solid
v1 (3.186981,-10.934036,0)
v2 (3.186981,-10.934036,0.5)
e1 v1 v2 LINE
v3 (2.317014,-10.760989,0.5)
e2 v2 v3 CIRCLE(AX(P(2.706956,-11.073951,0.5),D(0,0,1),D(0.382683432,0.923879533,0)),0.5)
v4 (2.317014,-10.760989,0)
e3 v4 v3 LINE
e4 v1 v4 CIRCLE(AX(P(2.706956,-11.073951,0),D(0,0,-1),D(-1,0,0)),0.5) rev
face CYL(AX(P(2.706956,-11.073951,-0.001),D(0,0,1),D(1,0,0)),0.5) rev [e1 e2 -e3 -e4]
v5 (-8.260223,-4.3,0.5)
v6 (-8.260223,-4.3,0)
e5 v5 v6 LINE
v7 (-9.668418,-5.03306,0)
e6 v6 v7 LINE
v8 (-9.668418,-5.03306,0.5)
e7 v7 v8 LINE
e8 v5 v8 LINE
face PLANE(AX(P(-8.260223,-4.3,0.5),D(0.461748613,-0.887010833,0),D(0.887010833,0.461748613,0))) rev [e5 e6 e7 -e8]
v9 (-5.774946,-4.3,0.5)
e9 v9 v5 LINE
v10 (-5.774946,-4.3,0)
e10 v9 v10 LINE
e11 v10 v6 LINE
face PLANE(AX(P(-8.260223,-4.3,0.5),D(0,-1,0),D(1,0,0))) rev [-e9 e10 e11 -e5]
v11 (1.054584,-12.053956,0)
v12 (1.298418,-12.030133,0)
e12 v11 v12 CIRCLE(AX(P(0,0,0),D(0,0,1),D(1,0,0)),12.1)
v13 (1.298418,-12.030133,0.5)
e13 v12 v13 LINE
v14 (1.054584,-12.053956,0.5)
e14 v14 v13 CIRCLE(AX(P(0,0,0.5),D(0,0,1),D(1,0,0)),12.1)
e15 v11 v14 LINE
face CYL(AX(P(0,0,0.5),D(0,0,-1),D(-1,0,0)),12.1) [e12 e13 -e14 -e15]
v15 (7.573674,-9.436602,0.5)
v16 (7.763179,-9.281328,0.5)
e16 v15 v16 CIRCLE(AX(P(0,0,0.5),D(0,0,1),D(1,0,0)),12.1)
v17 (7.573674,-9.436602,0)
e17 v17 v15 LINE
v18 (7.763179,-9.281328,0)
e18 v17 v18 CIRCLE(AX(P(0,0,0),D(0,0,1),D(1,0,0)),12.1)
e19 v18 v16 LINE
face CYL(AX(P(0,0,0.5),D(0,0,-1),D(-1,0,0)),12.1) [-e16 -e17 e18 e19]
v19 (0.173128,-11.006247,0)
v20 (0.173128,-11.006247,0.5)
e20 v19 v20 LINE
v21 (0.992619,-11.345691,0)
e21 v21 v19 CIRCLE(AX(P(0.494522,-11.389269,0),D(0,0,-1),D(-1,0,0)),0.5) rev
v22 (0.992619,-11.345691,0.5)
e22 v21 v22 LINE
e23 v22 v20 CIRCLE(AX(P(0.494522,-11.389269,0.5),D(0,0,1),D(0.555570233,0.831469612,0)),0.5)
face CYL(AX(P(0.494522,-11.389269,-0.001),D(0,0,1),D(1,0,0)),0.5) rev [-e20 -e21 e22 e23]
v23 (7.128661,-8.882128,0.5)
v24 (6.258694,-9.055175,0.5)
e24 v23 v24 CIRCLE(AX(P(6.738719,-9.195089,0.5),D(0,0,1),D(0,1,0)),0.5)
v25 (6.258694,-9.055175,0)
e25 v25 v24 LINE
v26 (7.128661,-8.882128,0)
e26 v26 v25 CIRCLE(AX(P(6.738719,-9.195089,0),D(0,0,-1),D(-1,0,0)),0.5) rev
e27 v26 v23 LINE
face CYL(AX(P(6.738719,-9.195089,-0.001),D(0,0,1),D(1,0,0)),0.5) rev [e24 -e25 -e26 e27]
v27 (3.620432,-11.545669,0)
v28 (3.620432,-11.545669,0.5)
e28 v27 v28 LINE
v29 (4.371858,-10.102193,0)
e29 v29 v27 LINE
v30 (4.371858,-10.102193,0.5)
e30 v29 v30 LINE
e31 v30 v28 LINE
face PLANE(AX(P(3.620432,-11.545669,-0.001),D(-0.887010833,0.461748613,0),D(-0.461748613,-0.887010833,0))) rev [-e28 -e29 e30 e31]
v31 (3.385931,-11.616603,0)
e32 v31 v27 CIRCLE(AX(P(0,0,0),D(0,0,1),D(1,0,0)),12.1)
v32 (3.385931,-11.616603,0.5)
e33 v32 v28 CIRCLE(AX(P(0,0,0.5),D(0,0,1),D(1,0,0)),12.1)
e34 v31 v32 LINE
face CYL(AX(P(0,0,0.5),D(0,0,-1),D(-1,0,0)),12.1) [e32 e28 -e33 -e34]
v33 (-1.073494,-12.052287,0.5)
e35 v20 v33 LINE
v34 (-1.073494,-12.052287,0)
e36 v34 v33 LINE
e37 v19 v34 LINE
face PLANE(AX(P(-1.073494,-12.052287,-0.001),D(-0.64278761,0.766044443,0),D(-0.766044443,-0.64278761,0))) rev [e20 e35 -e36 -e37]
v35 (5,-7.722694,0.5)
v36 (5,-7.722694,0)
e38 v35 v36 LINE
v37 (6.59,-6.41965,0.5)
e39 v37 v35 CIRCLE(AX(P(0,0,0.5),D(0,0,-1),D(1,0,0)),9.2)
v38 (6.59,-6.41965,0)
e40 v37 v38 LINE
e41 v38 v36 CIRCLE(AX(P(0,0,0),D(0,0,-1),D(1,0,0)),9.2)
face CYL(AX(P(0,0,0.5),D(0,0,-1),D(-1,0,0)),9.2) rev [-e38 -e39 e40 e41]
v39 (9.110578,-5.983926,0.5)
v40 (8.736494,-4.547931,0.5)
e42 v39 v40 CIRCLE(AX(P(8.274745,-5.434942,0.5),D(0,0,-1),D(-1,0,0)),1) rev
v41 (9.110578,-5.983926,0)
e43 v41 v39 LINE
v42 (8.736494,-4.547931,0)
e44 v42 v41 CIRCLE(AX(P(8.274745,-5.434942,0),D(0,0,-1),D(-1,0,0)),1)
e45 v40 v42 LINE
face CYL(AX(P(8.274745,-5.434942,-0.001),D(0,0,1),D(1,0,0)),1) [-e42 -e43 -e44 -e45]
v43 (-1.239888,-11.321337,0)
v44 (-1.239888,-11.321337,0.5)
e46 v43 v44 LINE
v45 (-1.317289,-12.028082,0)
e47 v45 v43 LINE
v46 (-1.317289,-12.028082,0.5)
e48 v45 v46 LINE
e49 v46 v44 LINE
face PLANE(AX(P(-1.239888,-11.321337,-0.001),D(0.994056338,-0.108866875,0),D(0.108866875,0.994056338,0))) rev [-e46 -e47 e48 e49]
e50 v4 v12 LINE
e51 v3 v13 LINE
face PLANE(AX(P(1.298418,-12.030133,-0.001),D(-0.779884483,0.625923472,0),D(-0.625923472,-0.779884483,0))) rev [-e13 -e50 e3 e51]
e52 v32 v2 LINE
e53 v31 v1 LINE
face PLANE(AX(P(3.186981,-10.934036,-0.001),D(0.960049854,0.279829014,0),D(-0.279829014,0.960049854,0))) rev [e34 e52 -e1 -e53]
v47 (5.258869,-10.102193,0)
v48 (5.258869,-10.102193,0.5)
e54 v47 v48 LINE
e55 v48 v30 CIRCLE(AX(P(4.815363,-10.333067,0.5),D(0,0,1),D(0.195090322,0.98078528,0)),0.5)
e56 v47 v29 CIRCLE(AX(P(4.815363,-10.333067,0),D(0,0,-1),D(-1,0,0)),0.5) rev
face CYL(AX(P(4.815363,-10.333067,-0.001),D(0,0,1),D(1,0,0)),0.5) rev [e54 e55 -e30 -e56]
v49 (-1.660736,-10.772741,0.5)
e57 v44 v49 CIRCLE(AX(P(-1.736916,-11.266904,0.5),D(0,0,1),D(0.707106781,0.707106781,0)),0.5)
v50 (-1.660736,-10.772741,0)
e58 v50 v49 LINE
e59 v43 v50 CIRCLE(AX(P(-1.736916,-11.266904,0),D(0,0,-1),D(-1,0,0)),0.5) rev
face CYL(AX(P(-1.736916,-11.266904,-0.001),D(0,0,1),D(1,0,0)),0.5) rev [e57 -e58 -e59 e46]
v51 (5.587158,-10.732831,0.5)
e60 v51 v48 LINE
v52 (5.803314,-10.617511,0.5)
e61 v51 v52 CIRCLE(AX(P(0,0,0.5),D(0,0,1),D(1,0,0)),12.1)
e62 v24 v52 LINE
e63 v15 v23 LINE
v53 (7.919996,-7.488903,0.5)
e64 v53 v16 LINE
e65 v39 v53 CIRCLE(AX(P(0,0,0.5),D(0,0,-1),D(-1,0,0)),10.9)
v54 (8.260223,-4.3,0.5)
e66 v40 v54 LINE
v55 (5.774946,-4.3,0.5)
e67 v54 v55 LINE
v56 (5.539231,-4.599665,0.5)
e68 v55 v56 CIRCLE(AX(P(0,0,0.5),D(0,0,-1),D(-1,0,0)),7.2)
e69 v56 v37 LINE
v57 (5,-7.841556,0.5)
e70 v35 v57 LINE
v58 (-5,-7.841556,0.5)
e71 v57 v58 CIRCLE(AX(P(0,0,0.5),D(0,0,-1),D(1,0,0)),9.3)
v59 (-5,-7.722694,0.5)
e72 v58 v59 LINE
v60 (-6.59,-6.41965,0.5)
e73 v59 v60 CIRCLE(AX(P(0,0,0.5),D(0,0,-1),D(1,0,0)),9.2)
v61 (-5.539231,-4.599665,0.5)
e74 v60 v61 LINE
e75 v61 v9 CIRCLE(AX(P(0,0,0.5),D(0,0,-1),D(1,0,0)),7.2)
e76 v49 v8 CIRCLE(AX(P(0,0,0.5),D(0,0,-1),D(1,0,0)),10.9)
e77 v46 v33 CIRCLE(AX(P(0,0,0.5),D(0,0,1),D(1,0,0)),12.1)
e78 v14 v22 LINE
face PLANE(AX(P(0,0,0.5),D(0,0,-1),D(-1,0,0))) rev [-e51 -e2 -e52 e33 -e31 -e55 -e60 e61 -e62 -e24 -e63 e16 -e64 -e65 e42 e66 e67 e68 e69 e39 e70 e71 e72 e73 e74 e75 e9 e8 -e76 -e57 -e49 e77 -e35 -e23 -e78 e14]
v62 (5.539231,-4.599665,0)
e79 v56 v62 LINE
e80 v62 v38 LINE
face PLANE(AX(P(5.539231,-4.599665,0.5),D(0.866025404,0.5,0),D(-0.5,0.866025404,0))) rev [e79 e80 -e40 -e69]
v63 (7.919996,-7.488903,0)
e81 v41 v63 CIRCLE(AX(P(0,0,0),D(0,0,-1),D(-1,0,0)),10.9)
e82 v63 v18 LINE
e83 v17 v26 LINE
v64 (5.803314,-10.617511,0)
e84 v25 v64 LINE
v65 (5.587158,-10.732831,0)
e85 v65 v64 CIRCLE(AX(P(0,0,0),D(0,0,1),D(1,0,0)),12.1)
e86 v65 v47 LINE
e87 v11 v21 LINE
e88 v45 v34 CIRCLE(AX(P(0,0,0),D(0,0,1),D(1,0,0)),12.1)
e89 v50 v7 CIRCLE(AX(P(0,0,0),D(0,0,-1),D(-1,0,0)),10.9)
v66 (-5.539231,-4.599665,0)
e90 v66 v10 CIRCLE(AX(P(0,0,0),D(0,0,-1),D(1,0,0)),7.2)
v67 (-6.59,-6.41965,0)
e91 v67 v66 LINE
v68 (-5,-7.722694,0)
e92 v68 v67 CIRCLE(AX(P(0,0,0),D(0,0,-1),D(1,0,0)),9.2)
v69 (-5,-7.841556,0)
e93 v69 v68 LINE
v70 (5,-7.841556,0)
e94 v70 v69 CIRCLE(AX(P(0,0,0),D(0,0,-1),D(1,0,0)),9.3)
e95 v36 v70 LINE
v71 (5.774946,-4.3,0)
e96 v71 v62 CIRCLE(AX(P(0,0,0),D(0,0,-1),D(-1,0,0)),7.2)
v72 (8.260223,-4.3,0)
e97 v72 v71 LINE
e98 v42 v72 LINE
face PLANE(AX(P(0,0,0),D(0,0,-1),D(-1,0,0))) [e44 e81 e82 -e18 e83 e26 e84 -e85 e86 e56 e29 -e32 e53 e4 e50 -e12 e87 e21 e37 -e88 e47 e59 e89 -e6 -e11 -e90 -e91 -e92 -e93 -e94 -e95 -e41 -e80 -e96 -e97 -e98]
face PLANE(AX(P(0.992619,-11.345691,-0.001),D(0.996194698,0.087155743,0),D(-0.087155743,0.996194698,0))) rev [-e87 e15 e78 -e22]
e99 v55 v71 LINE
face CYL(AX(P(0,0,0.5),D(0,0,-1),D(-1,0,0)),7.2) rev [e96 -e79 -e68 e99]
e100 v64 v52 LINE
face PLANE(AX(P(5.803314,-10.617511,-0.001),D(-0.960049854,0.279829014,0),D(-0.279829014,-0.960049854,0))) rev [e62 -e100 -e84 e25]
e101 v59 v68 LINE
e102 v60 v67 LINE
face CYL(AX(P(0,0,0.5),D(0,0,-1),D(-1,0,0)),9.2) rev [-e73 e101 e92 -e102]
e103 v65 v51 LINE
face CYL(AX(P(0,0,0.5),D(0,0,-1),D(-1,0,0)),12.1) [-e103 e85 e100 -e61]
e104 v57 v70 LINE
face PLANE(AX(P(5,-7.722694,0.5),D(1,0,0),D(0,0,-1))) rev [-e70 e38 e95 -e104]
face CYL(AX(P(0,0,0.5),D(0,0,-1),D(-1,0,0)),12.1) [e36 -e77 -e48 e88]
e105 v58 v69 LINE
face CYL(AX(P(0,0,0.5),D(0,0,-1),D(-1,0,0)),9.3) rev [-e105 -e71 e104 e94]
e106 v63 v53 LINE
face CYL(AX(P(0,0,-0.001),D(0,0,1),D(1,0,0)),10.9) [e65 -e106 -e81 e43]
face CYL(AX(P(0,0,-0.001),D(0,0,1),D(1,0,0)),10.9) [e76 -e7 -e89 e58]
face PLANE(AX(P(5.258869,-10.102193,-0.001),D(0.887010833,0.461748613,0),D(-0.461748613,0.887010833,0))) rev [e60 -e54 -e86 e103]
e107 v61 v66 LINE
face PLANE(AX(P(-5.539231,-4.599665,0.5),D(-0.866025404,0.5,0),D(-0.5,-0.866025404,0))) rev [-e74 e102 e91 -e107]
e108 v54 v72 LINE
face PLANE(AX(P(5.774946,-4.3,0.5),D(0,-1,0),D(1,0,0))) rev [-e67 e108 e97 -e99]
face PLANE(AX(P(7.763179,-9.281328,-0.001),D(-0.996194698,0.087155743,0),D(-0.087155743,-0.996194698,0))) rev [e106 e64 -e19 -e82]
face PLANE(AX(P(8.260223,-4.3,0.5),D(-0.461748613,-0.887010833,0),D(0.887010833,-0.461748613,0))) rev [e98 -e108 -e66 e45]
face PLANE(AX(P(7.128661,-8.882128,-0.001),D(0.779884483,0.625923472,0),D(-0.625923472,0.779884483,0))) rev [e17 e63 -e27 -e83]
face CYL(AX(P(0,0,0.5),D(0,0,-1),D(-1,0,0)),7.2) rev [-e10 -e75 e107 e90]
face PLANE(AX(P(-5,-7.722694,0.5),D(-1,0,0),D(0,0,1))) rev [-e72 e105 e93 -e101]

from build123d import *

# Parameters (mm, degrees)
OTHER_10076_5_DEPTH = 0.5
CUT_EXTRUDE1_START  = -0.5
CUT_EXTRUDE1_DEPTH  = 0.5


# Read off the part's stored shape, not the designer's step: 10076-5
with BuildPart() as part:
    # Other 10076-5 outline → Other 10076-5 (new body)
    with BuildSketch(Plane.XY):
        with BuildLine():
            ThreePointArc((7.573674013, -9.436602245), (7.668819519, -9.359444812), (7.763179028, -9.281328104))
            Line((7.763179028, -9.281328104), (7.919995926, -7.488902759))
            ThreePointArc((7.919995926, -7.488902759), (8.548470738, -6.76266575), (9.110578105, -5.983925684))
            ThreePointArc((9.110578105, -5.983925684), (9.242448569, -5.182849851), (8.736493865, -4.547930843))
            Line((8.736493865, -4.547930843), (8.260223146, -4.3))
            Line((8.260223146, -4.3), (5.774945887, -4.3))
            ThreePointArc((5.774945887, -4.3), (5.659072475, -4.451392897), (5.53923133, -4.5996648))
            Line((5.53923133, -4.5996648), (6.59, -6.419649523))
            ThreePointArc((6.59, -6.419649523), (5.831509763, -7.1157216), (5, -7.722693831))
            Line((5, -7.722693831), (5, -7.841555968))
            ThreePointArc((5, -7.841555968), (0, -9.3), (-5, -7.841555968))
            Line((-5, -7.841555968), (-5, -7.722693831))
            ThreePointArc((-5, -7.722693831), (-5.831509763, -7.1157216), (-6.59, -6.419649523))
            Line((-6.59, -6.419649523), (-5.53923133, -4.5996648))
            ThreePointArc((-5.53923133, -4.5996648), (-5.659072475, -4.451392897), (-5.774945887, -4.3))
            Line((-5.774945887, -4.3), (-8.260223146, -4.3))
            Line((-8.260223146, -4.3), (-10.732831081, -5.58715822))
            ThreePointArc((-10.732831081, -5.58715822), (-10.675718173, -5.6955282), (-10.617511084, -5.803314431))
            Line((-10.617511084, -5.803314431), (-9.055174855, -6.258693914))
            ThreePointArc((-9.055174855, -6.258693914), (-8.704696722, -6.64117368), (-8.882127626, -7.128661083))
            Line((-8.882127626, -7.128661083), (-9.436602245, -7.573674013))
            ThreePointArc((-9.436602245, -7.573674013), (-9.359444812, -7.668819519), (-9.281328104, -7.763179028))
            Line((-9.281328104, -7.763179028), (-7.660171598, -7.905011844))
            ThreePointArc((-7.660171598, -7.905011844), (-7.241809703, -8.211767477), (-7.320727248, -8.724502998))
            Line((-7.320727248, -8.724502998), (-7.777730077, -9.269137762))
            ThreePointArc((-7.777730077, -9.269137762), (-7.683493234, -9.347402405), (-7.588468891, -9.424709008))
            Line((-7.588468891, -9.424709008), (-5.970792243, -9.247544602))
            ThreePointArc((-5.970792243, -9.247544602), (-5.500623999, -9.466787654), (-5.477995427, -9.985067155))
            Line((-5.477995427, -9.985067155), (-5.819964104, -10.608393744))
            ThreePointArc((-5.819964104, -10.608393744), (-5.712269322, -10.666769858), (-5.603989074, -10.724052707))
            Line((-5.603989074, -10.724052707), (-4.05195869, -10.234699407))
            ThreePointArc((-4.05195869, -10.234699407), (-3.548052399, -10.358004491), (-3.424747314, -10.861910782))
            Line((-3.424747314, -10.861910782), (-3.638540174, -11.539975104))
            ThreePointArc((-3.638540174, -11.539975104), (-3.521526102, -11.576219327), (-3.404151099, -11.611277074))
            Line((-3.404151099, -11.611277074), (-1.977410637, -10.828540453))
            ThreePointArc((-1.977410637, -10.828540453), (-1.459131136, -10.851169025), (-1.239888083, -11.321337268))
            Line((-1.239888083, -11.321337268), (-1.317289186, -12.028081692))
            ThreePointArc((-1.317289186, -12.028081692), (-1.195452609, -12.04080118), (-1.073493507, -12.052286575))
            Line((-1.073493507, -12.052286575), (0.173128198, -11.006246762))
            ThreePointArc((0.173128198, -11.006246762), (0.685863719, -10.927329218), (0.992619352, -11.345691113))
            Line((0.992619352, -11.345691113), (1.054584487, -12.053955847))
            ThreePointArc((1.054584487, -12.053955847), (1.176561457, -12.042661796), (1.298417839, -12.030133462))
            Line((1.298417839, -12.030133462), (2.317013814, -10.760989181))
            ThreePointArc((2.317013814, -10.760989181), (2.804501216, -10.583558277), (3.186980982, -10.93403641))
            Line((3.186980982, -10.93403641), (3.38593107, -11.616603238))
            ThreePointArc((3.38593107, -11.616603238), (3.503360927, -11.581729673), (3.620431715, -11.545669067))
            Line((3.620431715, -11.545669067), (4.371857887, -10.10219282))
            ThreePointArc((4.371857887, -10.10219282), (4.815363304, -9.833067127), (5.258868721, -10.10219282))
            Line((5.258868721, -10.10219282), (5.58715822, -10.732831081))
            ThreePointArc((5.58715822, -10.732831081), (5.6955282, -10.675718173), (5.803314431, -10.617511084))
            Line((5.803314431, -10.617511084), (6.258693914, -9.055174855))
            ThreePointArc((6.258693914, -9.055174855), (6.64117368, -8.704696722), (7.128661083, -8.882127626))
            Line((7.128661083, -8.882127626), (7.573674013, -9.436602245))
        make_face()
    extrude(amount=OTHER_10076_5_DEPTH)

    # Sketch1 → Cut-Extrude1 (cut)
    with BuildSketch(Plane.XY.offset(0.5).offset(CUT_EXTRUDE1_START)):
        with BuildLine():
            Line((-9.668418082, -5.033059884), (-10.732831081, -5.58715822))
            ThreePointArc((-10.732831081, -5.58715822), (-7.683493234, -9.347402405), (-3.404151099, -11.611277074))
            Line((-3.404151099, -11.611277074), (-1.977410637, -10.828540453))
            ThreePointArc((-1.977410637, -10.828540453), (-1.823681131, -10.774489518), (-1.660735715, -10.772741382))
            ThreePointArc((-1.660735715, -10.772741382), (-6.350072233, -8.859265356), (-9.668418082, -5.033059884))
        make_face()
    extrude(amount=CUT_EXTRUDE1_DEPTH, mode=Mode.SUBTRACT)


solid = part.part
